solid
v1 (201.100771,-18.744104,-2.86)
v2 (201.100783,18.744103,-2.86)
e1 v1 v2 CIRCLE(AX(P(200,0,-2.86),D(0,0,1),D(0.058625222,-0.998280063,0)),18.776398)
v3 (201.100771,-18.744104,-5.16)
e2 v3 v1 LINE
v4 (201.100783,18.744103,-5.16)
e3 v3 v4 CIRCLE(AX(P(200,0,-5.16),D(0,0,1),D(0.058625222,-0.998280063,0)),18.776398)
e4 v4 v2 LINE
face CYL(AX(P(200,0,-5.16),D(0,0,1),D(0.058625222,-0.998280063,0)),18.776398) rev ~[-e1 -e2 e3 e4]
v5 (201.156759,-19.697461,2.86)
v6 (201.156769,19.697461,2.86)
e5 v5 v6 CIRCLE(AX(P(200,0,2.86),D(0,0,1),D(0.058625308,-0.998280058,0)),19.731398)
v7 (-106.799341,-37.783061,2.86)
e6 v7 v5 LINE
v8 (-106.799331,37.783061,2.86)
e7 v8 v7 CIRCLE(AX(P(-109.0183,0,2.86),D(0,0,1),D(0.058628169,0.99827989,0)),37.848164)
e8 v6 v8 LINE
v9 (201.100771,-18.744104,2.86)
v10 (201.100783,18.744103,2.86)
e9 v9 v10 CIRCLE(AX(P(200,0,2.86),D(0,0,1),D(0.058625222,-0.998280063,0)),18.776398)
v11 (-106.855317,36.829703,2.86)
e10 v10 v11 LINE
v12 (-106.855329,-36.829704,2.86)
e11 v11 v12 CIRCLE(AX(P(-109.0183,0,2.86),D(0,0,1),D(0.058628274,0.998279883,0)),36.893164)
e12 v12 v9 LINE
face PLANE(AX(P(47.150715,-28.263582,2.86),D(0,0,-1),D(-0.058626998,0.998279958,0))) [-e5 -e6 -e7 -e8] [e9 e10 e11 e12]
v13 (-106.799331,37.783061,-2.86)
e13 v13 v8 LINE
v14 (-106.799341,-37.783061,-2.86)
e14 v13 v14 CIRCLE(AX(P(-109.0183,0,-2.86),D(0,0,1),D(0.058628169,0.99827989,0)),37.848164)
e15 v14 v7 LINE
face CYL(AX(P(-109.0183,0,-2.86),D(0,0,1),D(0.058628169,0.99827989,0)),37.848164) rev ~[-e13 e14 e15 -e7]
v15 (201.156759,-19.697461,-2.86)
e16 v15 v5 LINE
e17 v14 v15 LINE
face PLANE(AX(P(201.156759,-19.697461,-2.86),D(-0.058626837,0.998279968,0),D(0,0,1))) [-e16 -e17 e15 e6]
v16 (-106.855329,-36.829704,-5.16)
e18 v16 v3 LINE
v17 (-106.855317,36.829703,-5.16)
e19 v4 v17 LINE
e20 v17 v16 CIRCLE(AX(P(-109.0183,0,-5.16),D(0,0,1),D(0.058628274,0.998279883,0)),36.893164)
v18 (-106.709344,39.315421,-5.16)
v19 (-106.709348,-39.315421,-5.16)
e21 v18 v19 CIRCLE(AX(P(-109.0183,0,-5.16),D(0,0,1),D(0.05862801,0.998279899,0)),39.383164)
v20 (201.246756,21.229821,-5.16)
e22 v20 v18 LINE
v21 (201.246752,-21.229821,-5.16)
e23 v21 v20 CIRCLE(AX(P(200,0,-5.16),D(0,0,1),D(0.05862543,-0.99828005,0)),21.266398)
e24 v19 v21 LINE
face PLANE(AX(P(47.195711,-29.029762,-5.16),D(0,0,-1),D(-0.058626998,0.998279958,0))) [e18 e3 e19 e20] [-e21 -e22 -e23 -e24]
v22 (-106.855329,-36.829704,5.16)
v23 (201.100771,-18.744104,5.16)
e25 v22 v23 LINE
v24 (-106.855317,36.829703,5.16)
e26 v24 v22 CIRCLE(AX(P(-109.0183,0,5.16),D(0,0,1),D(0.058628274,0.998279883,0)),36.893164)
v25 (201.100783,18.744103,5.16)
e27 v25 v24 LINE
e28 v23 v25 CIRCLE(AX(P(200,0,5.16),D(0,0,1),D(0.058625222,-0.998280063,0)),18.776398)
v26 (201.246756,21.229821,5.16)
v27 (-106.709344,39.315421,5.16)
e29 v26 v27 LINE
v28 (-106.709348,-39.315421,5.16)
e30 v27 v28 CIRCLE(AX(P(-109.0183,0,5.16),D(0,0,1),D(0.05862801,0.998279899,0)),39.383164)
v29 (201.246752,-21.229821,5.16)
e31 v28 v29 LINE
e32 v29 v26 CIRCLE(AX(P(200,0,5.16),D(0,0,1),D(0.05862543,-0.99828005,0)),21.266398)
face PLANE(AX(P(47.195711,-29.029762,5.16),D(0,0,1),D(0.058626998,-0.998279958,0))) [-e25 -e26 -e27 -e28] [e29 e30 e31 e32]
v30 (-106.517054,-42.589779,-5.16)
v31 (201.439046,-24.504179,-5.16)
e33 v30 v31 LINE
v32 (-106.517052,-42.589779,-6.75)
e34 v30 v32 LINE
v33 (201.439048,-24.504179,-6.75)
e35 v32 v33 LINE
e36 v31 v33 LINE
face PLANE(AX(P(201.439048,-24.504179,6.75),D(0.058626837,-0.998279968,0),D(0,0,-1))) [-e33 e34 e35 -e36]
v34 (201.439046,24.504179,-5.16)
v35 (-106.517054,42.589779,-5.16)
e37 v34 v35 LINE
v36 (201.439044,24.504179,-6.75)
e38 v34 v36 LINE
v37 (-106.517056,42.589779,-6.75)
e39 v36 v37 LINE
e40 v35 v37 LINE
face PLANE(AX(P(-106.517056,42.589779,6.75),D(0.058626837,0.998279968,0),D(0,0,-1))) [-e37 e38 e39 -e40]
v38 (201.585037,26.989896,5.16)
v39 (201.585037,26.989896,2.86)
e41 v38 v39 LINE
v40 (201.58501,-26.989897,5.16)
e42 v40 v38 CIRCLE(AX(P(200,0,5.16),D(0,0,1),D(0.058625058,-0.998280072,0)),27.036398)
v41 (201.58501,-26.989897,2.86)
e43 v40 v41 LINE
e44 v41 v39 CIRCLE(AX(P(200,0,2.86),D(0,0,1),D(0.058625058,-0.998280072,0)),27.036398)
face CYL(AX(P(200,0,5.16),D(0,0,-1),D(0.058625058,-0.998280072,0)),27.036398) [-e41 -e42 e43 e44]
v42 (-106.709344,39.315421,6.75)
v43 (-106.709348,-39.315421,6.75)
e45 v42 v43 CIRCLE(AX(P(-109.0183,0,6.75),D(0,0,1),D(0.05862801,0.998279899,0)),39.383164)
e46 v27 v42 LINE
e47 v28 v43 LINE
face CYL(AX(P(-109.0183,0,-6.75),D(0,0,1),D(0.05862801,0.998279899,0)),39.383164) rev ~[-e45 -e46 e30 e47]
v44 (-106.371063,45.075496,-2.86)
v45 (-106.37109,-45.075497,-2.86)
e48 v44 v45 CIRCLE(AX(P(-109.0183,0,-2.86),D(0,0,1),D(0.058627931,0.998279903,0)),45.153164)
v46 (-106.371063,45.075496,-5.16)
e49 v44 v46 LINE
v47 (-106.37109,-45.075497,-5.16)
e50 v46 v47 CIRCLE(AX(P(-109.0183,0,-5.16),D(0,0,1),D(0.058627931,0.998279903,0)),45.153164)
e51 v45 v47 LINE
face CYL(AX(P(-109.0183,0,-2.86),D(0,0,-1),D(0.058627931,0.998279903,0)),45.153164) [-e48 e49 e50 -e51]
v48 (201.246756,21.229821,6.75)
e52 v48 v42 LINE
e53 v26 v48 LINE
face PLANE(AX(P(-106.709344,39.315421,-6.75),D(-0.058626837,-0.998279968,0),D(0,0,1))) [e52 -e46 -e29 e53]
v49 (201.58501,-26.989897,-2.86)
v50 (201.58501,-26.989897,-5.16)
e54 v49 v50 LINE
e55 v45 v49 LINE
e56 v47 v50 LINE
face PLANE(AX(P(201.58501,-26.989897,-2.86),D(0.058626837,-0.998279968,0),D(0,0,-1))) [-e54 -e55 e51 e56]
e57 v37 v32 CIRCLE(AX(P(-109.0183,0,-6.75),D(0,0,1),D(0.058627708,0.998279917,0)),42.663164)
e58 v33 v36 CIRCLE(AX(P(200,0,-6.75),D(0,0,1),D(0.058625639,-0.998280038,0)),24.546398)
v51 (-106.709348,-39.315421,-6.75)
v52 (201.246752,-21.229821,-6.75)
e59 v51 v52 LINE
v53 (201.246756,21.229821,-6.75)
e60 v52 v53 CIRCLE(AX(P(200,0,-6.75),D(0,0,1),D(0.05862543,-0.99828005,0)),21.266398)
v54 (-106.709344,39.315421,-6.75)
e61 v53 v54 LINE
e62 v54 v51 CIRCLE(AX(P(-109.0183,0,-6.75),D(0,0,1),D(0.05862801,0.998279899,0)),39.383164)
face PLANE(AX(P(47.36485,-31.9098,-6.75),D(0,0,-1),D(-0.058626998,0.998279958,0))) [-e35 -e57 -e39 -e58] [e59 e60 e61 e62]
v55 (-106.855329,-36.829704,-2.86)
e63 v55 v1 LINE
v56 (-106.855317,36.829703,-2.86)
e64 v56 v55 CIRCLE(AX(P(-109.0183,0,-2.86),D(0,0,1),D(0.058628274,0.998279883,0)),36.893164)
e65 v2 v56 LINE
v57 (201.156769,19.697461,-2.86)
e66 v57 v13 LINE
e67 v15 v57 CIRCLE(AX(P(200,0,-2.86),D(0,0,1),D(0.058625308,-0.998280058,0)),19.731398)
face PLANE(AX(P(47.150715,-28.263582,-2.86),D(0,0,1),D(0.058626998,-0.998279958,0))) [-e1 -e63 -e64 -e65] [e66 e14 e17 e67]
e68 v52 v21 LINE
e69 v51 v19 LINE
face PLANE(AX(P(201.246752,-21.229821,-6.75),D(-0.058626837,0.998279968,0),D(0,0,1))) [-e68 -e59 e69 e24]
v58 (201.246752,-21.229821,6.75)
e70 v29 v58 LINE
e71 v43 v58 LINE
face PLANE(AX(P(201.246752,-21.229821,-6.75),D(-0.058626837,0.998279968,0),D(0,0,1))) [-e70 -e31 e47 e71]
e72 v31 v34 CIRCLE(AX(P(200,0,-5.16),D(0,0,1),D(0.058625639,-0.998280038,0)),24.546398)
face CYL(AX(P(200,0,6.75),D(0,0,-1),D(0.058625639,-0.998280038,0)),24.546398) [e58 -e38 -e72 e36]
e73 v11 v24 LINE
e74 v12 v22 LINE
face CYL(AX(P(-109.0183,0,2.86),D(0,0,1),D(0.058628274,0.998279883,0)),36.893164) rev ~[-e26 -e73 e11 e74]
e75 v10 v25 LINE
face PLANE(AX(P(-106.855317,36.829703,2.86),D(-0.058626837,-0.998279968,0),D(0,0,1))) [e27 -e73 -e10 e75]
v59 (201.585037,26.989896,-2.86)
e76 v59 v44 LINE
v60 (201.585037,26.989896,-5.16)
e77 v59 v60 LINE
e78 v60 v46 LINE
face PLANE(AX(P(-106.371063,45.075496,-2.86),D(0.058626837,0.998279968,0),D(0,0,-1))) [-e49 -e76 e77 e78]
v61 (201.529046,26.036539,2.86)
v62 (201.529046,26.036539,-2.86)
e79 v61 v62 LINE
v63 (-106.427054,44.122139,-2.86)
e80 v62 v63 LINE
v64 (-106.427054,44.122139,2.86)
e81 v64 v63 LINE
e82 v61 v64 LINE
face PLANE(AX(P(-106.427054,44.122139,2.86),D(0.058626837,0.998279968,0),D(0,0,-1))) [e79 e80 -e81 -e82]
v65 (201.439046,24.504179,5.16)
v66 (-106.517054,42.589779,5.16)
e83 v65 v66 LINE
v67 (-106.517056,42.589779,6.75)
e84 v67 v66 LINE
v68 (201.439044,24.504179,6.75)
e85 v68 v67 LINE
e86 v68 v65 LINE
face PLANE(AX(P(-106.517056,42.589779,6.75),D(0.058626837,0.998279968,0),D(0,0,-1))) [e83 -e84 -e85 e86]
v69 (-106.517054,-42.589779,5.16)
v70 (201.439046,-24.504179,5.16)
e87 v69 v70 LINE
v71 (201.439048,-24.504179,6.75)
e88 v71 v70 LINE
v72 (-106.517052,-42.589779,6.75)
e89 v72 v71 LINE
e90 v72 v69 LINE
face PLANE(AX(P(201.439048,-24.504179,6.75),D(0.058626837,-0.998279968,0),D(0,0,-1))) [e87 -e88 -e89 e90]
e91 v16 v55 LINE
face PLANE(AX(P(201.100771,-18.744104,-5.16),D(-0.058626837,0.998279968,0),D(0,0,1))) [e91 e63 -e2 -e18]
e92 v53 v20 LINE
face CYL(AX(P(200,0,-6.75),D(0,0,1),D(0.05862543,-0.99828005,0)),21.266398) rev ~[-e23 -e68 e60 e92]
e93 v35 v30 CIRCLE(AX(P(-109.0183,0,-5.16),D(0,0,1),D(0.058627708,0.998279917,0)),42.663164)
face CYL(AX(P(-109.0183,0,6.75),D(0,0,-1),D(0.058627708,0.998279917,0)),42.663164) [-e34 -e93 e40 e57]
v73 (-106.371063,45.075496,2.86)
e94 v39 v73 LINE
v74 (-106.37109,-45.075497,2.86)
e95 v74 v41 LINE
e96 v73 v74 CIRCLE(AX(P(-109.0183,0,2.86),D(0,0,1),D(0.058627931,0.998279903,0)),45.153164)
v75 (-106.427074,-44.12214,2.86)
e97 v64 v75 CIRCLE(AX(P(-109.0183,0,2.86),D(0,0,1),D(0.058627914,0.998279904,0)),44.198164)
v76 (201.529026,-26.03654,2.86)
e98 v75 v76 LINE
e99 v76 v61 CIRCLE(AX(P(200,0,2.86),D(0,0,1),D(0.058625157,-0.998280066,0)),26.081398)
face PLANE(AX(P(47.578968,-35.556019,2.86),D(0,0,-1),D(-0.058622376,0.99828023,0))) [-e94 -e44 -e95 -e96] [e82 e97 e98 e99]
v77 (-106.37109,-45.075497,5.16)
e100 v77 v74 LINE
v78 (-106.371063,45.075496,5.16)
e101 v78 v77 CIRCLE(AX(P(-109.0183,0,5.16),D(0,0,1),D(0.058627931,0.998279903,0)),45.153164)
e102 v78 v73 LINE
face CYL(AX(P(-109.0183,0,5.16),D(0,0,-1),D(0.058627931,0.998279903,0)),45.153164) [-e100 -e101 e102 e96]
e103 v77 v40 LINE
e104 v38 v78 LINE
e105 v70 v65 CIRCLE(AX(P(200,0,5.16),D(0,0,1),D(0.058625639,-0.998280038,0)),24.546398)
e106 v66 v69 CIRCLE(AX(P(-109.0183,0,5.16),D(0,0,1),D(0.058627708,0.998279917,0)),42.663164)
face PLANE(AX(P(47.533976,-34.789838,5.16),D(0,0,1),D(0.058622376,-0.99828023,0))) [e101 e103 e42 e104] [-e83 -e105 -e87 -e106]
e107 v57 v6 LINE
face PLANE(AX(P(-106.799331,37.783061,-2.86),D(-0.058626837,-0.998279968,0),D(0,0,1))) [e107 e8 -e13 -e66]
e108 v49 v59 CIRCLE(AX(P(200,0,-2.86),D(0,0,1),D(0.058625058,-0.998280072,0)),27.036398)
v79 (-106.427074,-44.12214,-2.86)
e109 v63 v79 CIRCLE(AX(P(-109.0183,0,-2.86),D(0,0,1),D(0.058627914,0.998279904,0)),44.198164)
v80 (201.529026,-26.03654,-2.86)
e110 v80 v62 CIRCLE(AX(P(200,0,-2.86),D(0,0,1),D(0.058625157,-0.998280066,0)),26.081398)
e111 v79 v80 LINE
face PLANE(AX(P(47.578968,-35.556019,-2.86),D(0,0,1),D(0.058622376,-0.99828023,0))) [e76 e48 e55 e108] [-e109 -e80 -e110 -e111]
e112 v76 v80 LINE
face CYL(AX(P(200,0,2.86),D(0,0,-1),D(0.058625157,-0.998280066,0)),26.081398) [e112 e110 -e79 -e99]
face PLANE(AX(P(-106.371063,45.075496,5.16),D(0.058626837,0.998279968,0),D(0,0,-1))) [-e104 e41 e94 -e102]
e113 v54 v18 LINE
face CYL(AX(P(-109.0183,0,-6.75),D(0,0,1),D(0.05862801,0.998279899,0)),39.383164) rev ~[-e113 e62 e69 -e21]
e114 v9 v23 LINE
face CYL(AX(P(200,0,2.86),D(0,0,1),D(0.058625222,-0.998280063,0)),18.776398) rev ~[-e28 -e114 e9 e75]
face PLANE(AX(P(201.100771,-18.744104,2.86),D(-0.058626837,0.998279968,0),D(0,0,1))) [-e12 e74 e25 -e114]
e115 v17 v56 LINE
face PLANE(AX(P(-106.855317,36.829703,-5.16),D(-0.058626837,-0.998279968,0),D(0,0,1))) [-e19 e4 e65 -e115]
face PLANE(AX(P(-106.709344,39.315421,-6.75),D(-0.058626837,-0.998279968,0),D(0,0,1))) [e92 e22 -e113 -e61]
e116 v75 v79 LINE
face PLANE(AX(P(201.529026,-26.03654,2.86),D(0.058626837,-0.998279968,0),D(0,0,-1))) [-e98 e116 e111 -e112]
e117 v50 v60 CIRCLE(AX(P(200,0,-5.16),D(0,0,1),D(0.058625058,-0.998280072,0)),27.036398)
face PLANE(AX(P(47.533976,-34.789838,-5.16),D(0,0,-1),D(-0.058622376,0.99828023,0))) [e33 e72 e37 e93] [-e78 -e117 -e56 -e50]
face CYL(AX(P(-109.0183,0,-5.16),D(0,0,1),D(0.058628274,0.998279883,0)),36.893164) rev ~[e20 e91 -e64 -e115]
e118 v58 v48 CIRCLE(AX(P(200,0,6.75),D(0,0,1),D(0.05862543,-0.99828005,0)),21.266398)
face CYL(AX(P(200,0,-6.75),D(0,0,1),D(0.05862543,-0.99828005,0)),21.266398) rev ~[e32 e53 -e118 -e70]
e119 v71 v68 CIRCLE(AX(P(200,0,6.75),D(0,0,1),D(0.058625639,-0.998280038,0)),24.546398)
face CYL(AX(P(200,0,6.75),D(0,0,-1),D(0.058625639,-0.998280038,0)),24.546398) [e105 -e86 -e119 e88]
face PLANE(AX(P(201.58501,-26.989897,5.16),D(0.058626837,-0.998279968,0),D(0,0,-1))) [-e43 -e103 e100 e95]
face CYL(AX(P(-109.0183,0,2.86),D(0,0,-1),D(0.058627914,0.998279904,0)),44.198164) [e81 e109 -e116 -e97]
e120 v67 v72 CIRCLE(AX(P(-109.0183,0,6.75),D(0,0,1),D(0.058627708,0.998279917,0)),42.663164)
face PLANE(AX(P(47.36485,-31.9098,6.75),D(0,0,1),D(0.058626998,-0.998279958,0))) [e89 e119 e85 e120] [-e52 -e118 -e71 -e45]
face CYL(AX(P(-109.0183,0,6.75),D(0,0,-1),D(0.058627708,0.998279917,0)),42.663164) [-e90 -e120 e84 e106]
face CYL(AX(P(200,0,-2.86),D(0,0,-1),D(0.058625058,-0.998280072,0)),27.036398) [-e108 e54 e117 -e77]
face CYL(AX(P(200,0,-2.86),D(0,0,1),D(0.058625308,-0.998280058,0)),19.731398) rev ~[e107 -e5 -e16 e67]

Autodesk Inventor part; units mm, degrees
ref_plane "Work Plane2" through (-109.0183, 0, 0) normal (-1, 0, 0) x (0, 0, 1)
ref_plane "Work Plane3" through (200, 0, 0) normal (-0.9782514, 0.2074228, 0) x (0, 0, 1)
sketch "Path" plane through (0, 0, 0) normal (0, 0, 1) x (1, 0, 0)
  arc A0 (-106.6132, 40.9526) -> (-106.6132, -40.9526) centre (-109.0183, 0) ccw
  arc A1 (201.3429, -22.867) -> (201.3429, 22.867) centre (200, 0) ccw
  line L0 (201.3429, -22.867) -> (-106.6132, -40.9526)
  line L1 (-106.6132, 40.9526) -> (201.3429, 22.867)
  dimension "d31" = 8.26
ref_plane "Section Plane" through (-106.6132, -40.9526, 0) normal (0.99828, 0.058627, 0) x (0, 0, 1)
sketch "Section Sketch" plane through (-106.6132, -40.9526, 0) normal (0.99828, 0.058627, 0) x (0, 0, 1)
  line L0 (-6.75, -1.64) -> (6.75, -1.64)
  line L1 (6.75, -1.64) -> (6.75, 1.64)
  line L2 (6.75, 1.64) -> (-6.75, 1.64)
  line L3 (-6.75, 1.64) -> (-6.75, -1.64)
  line L4 (-2.86, -3.175) -> (2.86, -3.175)
  line L5 (2.86, -3.175) -> (2.86, 3.175)
  line L6 (2.86, 3.175) -> (-2.86, 3.175)
  line L7 (-2.86, 3.175) -> (-2.86, -3.175)
  line L8 (-2.86, 0) -> (2.86, 0) construction
  line L9 (-5.16, -4.13) -> (-2.86, -4.13)
  line L10 (-2.86, -4.13) -> (-2.86, 4.13)
  line L11 (-2.86, 4.13) -> (-5.16, 4.13)
  line L12 (-5.16, 4.13) -> (-5.16, -4.13)
  line L13 (2.86, -4.13) -> (5.16, -4.13)
  line L14 (5.16, -4.13) -> (5.16, 4.13)
  line L15 (5.16, 4.13) -> (2.86, 4.13)
  line L16 (2.86, 4.13) -> (2.86, -4.13)
  line L17 (-6.75, 0) -> (6.75, 0) construction
  point P0 (0, 0)
  point P1 (0, 0)
  dimension "d21" = 3.28
  dimension "d22" = 6.35
  dimension "d23" = 5.72
  dimension "d24" = 2.3
  dimension "d31" = 8.26
  dimension "d32" = 13.5
sweep "Solid" add profiles "Section Sketch" path "Path"
pattern_of_one "Strand Pattern"
equation "\"d21\" = da_d2"
equation "\"d22\" = da_d1"
equation "\"d23\" = da_b1"
equation "\"d24\" = da_t1 + da_t2"
equation "\"d30\" = da_pt"
equation "\"da_p\" = 9.525"
equation "\"da_b1\" = 5.72"
equation "\"da_h2\" = 8.26"
equation "\"da_h3\" = 8.26"
equation "\"da_d1\" = 6.35"
equation "\"da_d2\" = 3.28"
equation "\"da_pt\" = 10.24"
equation "\"da_b\" = 13.5"
equation "\"da_t1\" = 1.3"
equation "\"da_t2\" = 1"
properties part number "Roller Chain"
